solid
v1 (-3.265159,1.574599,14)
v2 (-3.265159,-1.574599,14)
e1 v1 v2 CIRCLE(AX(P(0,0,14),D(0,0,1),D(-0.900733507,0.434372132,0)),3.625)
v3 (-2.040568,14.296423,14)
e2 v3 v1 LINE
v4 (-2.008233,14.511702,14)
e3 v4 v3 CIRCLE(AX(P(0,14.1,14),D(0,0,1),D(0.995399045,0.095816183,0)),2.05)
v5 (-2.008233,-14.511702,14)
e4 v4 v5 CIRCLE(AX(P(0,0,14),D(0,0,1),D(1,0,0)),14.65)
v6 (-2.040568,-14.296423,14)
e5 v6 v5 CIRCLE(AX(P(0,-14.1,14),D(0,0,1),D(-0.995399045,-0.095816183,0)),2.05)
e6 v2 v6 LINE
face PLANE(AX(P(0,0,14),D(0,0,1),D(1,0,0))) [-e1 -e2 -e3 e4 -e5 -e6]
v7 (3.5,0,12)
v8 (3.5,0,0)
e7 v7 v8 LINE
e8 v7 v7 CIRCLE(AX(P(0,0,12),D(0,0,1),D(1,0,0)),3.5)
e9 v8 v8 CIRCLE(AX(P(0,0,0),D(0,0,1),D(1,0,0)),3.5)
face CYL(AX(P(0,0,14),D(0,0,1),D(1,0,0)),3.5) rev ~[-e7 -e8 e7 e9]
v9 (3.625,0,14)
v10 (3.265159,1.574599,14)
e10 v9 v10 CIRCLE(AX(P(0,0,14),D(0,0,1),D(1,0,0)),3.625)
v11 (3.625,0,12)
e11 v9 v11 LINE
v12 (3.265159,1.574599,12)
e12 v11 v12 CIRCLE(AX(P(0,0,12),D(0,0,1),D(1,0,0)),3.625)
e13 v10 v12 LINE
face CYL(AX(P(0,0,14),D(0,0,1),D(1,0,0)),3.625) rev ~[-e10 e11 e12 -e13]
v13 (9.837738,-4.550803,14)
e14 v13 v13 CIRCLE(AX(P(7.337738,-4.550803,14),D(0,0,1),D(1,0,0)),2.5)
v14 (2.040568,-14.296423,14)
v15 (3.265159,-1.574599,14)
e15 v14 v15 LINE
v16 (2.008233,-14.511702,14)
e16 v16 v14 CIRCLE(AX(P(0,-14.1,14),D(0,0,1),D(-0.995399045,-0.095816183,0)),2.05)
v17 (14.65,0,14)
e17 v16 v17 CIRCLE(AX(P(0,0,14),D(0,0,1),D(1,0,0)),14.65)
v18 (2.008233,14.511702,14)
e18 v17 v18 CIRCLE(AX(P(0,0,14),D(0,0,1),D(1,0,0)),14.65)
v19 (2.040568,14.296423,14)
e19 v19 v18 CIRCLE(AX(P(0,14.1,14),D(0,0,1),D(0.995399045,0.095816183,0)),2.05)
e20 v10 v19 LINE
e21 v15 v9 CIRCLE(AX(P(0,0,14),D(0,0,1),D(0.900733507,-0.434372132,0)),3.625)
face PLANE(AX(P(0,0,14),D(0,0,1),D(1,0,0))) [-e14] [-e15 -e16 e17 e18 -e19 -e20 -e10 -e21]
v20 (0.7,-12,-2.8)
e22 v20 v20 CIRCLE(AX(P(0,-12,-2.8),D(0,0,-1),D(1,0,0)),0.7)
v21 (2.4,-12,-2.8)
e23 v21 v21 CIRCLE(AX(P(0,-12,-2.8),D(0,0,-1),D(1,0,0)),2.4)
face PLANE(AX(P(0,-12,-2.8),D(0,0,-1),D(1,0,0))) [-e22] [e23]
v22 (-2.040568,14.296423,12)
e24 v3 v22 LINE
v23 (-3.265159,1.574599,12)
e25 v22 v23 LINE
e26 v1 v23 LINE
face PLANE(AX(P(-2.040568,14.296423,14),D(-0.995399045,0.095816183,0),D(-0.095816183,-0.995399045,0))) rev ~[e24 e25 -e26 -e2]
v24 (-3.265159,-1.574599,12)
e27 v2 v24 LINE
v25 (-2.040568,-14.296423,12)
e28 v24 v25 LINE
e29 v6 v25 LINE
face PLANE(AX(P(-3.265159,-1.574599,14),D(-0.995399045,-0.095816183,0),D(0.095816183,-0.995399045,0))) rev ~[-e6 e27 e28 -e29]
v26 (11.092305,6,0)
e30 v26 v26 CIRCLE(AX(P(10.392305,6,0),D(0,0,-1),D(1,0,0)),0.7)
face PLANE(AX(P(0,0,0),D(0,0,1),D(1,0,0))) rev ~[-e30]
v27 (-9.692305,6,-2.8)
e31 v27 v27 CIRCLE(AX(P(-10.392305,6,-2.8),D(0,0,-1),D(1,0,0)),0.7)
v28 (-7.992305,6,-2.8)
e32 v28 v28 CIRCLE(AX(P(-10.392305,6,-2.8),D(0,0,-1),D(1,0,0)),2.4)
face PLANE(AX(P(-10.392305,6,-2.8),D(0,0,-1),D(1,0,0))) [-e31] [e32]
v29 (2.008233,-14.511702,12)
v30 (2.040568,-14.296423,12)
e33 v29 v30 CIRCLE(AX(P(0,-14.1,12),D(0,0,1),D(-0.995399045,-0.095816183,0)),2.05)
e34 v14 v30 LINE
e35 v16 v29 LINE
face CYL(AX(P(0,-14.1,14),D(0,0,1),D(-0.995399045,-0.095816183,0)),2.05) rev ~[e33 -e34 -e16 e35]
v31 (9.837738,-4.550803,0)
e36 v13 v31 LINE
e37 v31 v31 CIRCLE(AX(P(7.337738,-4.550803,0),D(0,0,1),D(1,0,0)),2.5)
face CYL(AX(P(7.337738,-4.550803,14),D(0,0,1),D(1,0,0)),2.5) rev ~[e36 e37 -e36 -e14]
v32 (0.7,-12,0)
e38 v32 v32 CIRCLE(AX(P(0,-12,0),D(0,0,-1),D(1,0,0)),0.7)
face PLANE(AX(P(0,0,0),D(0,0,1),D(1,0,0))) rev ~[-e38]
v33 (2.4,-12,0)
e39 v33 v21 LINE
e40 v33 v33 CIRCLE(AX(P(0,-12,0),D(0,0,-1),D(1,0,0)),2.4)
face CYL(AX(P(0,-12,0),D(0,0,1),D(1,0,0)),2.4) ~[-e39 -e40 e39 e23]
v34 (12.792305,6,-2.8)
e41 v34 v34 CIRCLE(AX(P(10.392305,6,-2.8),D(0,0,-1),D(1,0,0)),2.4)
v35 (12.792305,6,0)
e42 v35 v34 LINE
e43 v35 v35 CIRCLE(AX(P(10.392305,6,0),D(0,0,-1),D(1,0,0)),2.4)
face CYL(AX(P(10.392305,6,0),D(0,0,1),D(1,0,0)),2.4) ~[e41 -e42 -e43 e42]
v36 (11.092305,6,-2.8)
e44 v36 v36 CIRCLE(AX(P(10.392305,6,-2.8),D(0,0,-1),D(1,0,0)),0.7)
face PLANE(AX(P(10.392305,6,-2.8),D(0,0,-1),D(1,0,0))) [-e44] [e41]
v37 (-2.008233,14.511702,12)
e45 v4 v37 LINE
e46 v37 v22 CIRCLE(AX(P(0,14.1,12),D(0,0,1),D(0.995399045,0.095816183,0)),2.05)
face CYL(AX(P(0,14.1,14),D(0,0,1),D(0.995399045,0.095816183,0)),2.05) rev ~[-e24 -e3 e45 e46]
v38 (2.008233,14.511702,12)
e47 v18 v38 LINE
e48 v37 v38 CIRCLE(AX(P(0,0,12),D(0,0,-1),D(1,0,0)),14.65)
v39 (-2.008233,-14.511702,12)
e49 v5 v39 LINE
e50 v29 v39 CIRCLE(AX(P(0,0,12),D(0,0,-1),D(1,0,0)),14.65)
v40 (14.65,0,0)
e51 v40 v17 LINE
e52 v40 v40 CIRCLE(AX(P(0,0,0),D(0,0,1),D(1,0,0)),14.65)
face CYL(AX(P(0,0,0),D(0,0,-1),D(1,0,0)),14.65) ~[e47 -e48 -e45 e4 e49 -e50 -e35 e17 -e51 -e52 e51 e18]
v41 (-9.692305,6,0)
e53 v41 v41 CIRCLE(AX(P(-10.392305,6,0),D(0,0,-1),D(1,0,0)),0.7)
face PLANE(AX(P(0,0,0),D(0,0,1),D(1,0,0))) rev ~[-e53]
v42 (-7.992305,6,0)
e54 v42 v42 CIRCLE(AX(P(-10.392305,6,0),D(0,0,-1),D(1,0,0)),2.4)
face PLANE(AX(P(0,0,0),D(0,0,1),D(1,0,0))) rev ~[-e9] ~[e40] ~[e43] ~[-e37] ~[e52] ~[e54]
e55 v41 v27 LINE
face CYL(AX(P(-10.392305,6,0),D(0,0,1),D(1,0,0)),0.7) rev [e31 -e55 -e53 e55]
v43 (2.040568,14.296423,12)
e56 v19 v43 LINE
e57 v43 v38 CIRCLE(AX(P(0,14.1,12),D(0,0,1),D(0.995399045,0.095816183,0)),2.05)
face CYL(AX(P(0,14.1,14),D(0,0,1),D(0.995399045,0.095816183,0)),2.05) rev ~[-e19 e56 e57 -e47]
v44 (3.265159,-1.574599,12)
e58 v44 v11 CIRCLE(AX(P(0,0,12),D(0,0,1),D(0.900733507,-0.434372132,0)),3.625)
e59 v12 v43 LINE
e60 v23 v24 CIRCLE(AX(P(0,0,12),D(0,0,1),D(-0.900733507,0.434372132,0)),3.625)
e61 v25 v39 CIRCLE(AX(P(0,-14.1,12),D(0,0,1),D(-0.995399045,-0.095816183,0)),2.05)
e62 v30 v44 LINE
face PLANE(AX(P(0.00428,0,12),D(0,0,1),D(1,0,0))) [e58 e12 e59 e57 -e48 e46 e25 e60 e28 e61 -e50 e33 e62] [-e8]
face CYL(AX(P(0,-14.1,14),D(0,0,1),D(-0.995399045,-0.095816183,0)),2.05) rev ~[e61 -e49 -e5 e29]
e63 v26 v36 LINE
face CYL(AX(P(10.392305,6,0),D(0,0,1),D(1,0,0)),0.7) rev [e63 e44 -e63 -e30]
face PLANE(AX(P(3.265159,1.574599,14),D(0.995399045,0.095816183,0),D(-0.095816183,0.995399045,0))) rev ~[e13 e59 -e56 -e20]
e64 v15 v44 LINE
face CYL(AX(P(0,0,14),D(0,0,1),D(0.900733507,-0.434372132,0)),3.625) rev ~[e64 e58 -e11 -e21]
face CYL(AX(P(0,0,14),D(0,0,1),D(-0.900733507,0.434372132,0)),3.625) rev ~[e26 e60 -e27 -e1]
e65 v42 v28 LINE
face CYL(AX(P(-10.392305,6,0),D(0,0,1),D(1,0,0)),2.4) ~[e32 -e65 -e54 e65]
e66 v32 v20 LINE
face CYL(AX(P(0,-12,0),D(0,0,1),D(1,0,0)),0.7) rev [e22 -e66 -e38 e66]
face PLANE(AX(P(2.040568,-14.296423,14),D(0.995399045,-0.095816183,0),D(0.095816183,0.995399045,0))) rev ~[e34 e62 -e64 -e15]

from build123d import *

# Parameters (mm, degrees)
F0_R     = 14.65
F1_DEPTH = 14
F2_R     = 2.4
F2_R_2   = 0.7
F3_DEPTH = 2.8
F4_R     = 3.5
F4_R_2   = 2.5
F5_DEPTH = 25
F7_DEPTH = 2


# Not quite as in the source:
# - a feature of the source that left no trace in its solid (it failed there, or was rolled back) is left out


with BuildPart() as f1:
    # F0 (on Top) → F1 (new body)
    with BuildSketch(Plane.XY):
        Circle(F0_R)
    extrude(amount=F1_DEPTH)

    # F2 (on face) → F3 (join)
    with BuildSketch(Plane(origin=(0, 0, 0), x_dir=(1, 0, 0), z_dir=(0, 0, -1))):
        with Locations((0, 12)):
            Circle(F2_R)
        with Locations((0, 12)):
            Circle(F2_R_2, mode=Mode.SUBTRACT)
        with Locations((-10.3923048454, -6)):
            Circle(F2_R)
        with Locations((-10.3923048454, -6)):
            Circle(F2_R_2, mode=Mode.SUBTRACT)
        with Locations((10.3923048454, -6)):
            Circle(F2_R)
        with Locations((10.3923048454, -6)):
            Circle(F2_R_2, mode=Mode.SUBTRACT)
    extrude(amount=F3_DEPTH)

    # F4 (on face) → F5 (cut)
    with BuildSketch(Plane.XY.offset(14)):
        Circle(F4_R)
        with Locations((7.3377376988, -4.5508025283)):
            Circle(F4_R_2)
    extrude(amount=-F5_DEPTH, mode=Mode.SUBTRACT)

    # F6 (on face) → F7 (cut)
    with BuildSketch(Plane.XY.offset(14)):
        with BuildLine():
            ThreePointArc((3.265158964, -1.5745989775), (3.533894894, -0.8075963582), (3.625, 0))
            ThreePointArc((3.625, 0), (3.533894894, 0.8075963582), (3.265158964, 1.5745989775))
            ThreePointArc((3.265158964, 1.5745989775), (0, 3.625), (-3.265158964, 1.5745989775))
            ThreePointArc((-3.265158964, 1.5745989775), (-3.625, 0), (-3.265158964, -1.5745989775))
            ThreePointArc((-3.265158964, -1.5745989775), (0, -3.625), (3.265158964, -1.5745989775))
        make_face()
        with BuildLine():
            ThreePointArc((-3.265158964, 1.5745989775), (0, 3.625), (3.265158964, 1.5745989775))
            Line((3.265158964, 1.5745989775), (2.0405680426, 14.2964231749))
            ThreePointArc((2.0405680426, 14.2964231749), (2.047640653, 14.1983247495), (2.05, 14.1))
            ThreePointArc((2.05, 14.1), (-0.0983247495, 12.052359347), (-2.0405680426, 14.2964231749))
            Line((-2.0405680426, 14.2964231749), (-3.265158964, 1.5745989775))
        make_face()
        with BuildLine():
            Line((2.0405680426, -14.2964231749), (3.265158964, -1.5745989775))
            ThreePointArc((3.265158964, -1.5745989775), (0, -3.625), (-3.265158964, -1.5745989775))
            Line((-3.265158964, -1.5745989775), (-2.0405680426, -14.2964231749))
            ThreePointArc((-2.0405680426, -14.2964231749), (-0.0983247495, -12.052359347), (2.05, -14.1))
            ThreePointArc((2.05, -14.1), (2.047640653, -14.1983247495), (2.0405680426, -14.2964231749))
        make_face()
        with BuildLine():
            ThreePointArc((2.05, 14.1), (2.047640653, 14.1983247495), (2.0405680426, 14.2964231749))
            ThreePointArc((2.0405680426, 14.2964231749), (0, 16.15), (-2.0405680426, 14.2964231749))
            ThreePointArc((-2.0405680426, 14.2964231749), (-0.0983247495, 12.052359347), (2.05, 14.1))
        make_face()
        with BuildLine():
            ThreePointArc((-2.0405680426, -14.2964231749), (0, -16.15), (2.0405680426, -14.2964231749))
            ThreePointArc((2.0405680426, -14.2964231749), (2.047640653, -14.1983247495), (2.05, -14.1))
            ThreePointArc((2.05, -14.1), (-0.0983247495, -12.052359347), (-2.0405680426, -14.2964231749))
        make_face()
    extrude(amount=-F7_DEPTH, mode=Mode.SUBTRACT)


solid = f1.part
